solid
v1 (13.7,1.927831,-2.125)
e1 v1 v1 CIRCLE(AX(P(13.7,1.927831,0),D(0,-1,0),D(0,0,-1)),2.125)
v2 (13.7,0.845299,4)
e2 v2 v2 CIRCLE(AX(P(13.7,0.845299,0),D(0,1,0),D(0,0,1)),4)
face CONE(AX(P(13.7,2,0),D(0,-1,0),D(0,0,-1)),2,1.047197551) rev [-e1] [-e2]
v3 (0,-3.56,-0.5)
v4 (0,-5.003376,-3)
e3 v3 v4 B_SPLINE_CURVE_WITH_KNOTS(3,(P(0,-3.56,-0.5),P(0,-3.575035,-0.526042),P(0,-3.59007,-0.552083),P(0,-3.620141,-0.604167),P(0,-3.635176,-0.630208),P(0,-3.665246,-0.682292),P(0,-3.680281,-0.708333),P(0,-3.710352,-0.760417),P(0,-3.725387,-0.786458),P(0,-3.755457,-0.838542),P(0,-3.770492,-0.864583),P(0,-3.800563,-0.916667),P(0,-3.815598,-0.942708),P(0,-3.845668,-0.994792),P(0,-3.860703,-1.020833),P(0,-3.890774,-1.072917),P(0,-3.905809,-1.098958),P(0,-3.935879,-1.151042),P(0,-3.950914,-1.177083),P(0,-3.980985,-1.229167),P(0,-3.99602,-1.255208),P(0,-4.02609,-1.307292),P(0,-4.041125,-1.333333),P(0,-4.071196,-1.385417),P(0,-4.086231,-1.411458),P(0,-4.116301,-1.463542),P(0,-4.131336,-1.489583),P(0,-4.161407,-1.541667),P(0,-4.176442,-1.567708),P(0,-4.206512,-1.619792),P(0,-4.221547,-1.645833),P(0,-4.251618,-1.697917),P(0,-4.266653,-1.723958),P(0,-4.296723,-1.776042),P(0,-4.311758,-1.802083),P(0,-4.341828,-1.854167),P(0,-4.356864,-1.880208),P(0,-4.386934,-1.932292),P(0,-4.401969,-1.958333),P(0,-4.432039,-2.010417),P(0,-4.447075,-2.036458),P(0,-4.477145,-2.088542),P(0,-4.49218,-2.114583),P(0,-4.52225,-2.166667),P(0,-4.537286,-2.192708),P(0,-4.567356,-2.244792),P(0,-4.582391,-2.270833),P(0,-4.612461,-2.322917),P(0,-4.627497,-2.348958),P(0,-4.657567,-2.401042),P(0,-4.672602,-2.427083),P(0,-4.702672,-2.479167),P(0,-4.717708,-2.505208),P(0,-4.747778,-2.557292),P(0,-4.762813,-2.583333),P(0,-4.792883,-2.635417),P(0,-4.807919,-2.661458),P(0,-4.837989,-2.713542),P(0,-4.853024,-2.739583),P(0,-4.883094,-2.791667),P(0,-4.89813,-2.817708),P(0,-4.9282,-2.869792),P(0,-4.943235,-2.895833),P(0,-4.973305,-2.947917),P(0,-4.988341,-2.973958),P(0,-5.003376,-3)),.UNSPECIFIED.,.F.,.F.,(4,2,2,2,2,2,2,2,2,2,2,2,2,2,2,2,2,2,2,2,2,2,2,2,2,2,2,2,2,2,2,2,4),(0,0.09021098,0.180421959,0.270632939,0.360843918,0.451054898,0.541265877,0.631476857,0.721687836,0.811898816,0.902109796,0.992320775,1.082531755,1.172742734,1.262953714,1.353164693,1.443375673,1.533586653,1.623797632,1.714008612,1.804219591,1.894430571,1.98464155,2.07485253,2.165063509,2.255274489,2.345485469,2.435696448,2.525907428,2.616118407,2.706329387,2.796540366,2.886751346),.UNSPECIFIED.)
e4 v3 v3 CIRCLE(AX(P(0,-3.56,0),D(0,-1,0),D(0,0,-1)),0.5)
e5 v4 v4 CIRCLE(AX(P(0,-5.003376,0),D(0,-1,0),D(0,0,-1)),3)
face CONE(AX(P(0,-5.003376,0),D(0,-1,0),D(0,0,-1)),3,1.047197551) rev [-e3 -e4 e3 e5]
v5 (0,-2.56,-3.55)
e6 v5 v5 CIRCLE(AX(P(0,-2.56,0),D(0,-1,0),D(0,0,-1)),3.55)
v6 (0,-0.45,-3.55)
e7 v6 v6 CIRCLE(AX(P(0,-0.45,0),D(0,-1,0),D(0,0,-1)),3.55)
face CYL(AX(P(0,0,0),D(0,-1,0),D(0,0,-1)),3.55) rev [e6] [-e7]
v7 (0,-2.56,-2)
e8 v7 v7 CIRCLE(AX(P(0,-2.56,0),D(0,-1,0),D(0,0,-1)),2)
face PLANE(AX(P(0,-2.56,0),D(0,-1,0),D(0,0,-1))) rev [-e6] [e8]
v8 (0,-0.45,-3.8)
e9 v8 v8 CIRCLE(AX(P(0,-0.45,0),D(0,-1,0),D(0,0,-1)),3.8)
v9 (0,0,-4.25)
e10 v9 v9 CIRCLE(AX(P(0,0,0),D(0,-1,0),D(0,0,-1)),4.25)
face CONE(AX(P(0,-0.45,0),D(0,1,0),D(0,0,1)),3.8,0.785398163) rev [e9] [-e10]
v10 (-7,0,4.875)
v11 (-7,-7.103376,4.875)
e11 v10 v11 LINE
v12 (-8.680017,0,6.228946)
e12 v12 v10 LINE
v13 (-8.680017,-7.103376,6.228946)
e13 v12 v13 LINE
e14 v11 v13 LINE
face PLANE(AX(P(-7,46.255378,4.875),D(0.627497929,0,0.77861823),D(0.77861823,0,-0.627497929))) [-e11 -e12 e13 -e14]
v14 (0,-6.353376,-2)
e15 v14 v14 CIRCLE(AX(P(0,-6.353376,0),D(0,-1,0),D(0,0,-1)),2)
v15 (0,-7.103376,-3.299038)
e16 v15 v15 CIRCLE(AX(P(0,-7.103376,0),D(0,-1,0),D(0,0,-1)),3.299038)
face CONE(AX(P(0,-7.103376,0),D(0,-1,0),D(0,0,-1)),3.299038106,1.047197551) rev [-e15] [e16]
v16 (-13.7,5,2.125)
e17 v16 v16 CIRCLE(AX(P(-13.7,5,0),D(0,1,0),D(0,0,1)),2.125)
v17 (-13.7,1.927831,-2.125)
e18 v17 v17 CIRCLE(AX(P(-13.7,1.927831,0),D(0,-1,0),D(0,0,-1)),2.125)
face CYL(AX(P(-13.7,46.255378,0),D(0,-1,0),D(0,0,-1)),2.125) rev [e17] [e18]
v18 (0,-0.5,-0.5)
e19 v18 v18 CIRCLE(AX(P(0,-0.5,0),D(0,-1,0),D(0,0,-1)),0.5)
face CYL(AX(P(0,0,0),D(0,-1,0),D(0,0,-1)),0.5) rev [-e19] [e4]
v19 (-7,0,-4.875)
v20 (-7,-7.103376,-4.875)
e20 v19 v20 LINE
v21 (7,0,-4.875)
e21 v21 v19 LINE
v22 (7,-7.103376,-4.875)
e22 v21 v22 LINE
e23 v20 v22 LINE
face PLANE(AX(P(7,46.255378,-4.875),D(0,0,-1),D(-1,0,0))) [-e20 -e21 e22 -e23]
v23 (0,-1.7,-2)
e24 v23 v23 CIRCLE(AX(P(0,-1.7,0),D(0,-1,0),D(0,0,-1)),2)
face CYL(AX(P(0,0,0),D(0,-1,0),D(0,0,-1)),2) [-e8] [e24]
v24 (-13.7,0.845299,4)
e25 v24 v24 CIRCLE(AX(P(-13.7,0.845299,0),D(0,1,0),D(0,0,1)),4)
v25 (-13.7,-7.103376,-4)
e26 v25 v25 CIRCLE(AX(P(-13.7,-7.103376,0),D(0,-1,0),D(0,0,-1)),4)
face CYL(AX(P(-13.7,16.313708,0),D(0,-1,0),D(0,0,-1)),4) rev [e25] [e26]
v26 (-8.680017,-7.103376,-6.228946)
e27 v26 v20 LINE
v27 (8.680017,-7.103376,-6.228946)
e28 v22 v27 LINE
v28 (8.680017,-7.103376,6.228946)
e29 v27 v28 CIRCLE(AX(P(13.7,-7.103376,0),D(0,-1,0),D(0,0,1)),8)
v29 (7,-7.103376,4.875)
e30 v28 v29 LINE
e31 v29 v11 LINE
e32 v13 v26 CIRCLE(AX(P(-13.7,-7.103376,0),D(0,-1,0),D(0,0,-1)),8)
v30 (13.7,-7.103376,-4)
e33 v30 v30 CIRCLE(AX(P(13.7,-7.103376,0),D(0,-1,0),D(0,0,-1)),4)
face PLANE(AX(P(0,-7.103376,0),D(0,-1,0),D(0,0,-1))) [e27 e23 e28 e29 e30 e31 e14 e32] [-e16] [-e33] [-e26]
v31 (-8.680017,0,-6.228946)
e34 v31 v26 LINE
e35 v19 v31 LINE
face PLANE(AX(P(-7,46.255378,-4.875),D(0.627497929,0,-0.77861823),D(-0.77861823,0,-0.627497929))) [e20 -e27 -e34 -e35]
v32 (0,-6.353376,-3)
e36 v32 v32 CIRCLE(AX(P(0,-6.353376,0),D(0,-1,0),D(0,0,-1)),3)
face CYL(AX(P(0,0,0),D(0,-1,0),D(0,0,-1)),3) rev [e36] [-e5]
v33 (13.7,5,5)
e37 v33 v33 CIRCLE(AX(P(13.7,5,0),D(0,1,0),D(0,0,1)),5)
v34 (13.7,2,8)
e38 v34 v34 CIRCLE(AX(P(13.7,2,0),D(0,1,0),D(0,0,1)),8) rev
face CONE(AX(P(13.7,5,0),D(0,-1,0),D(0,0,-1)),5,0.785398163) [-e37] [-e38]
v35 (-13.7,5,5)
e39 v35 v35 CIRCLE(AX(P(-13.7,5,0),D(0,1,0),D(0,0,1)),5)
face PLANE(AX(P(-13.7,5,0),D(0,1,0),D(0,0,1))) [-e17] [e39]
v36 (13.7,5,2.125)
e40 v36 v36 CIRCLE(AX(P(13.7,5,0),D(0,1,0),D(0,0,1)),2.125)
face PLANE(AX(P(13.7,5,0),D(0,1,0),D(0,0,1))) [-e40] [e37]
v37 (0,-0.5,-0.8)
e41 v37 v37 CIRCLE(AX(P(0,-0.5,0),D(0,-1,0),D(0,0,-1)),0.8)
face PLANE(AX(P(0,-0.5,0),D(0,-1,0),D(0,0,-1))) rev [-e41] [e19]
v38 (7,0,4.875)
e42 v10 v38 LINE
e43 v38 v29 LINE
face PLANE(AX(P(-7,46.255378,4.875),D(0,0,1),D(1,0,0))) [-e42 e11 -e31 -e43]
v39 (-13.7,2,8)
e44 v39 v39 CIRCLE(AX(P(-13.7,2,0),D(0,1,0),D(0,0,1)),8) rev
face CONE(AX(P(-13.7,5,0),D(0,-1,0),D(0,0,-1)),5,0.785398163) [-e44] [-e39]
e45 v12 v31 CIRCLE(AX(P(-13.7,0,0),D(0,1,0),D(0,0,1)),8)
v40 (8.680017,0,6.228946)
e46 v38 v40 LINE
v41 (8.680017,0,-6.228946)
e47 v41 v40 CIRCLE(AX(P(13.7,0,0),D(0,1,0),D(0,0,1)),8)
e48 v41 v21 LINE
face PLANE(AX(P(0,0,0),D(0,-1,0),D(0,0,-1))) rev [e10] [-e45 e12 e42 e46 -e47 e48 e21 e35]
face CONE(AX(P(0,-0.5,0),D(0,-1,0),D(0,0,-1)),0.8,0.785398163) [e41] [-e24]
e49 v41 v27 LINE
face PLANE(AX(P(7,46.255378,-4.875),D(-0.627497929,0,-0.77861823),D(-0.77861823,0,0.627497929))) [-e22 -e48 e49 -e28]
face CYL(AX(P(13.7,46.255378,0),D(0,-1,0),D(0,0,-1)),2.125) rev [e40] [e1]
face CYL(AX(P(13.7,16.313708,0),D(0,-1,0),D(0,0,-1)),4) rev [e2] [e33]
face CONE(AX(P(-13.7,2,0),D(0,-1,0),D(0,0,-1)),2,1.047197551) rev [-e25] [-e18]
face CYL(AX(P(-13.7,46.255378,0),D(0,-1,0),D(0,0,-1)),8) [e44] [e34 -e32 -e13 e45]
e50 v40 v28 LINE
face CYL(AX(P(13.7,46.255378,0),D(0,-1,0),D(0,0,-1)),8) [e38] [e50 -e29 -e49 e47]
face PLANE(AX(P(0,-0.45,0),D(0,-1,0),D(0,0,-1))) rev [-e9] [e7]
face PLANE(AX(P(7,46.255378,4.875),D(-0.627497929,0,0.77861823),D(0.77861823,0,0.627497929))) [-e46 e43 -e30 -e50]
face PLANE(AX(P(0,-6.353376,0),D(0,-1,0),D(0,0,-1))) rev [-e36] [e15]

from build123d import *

# Parameters (mm, degrees)
BOSS_EXTRUDE3_START = -7.103375673
SKETCH4_R           = 2.125
SKETCH4_R_2         = 4.25
BOSS_EXTRUDE3_DEPTH = 7.103375673
BOSS_EXTRUDE4_START = 5
SKETCH6_R           = 8
SKETCH6_R_2         = 2.125
BOSS_EXTRUDE4_DEPTH = 5
SKETCH5_R           = 4
CUT_EXTRUDE2_DEPTH  = 9.103375673
CHAMFER2_SIZE       = 1.154700538
CHAMFER2_SIZE_2     = 2
CHAMFER3_SIZE       = 3


# Read off the part's stored shape, not the designer's step: Revolve1
with BuildPart() as part:
    # Revolve1 outline → Revolve1 (revolve)
    with BuildSketch(Plane.XY):
        Polygon((4.25, 0), (3.8, -0.45), (3.55, -0.45), (3.55, -2.56), (2, -2.56), (2, -1.7), (0.8, -0.5), (0.5, -0.5), (0.5, -3.56), (3, -5.003375673), (3, -6.353375673), (2, -6.353375673), (3.299038106, -7.103375673), (4.25, -7.103375673), align=None)
    revolve(axis=Axis((0, 0, 0), (0, 1, 0)))

    # Sketch4 → Boss-Extrude3 (add)
    with BuildSketch(Plane.XZ.offset(7.103375673).offset(BOSS_EXTRUDE3_START)):
        with BuildLine():
            Line((-7, 4.875), (7, 4.875))
            Line((7, 4.875), (8.680016564, 6.228945842))
            ThreePointArc((8.680016564, 6.228945842), (21.7, 0), (8.680016564, -6.228945842))
            Line((8.680016564, -6.228945842), (7, -4.875))
            Line((7, -4.875), (-7, -4.875))
            Line((-7, -4.875), (-8.680016564, -6.228945842))
            ThreePointArc((-8.680016564, -6.228945842), (-21.7, 0), (-8.680016564, 6.228945842))
            Line((-8.680016564, 6.228945842), (-7, 4.875))
        make_face()
        with Locations(Location((-13.7, 0, 0), (0, 0, 270))):
            Circle(SKETCH4_R, mode=Mode.SUBTRACT)
        with Locations(Location((13.7, 0, 0), (0, 0, 270))):
            Circle(SKETCH4_R, mode=Mode.SUBTRACT)
        Circle(SKETCH4_R_2, mode=Mode.SUBTRACT)
    extrude(amount=BOSS_EXTRUDE3_DEPTH)

    # Sketch6 → Boss-Extrude4 (add)
    # profile 1 of 2: a face of its own
    with BuildSketch(Plane(origin=(0, 0, 0), x_dir=(1, 0, 0), z_dir=(0, 1, 0)).offset(BOSS_EXTRUDE4_START)):
        with Locations(Location((-13.7, 0, 0), (0, 0, 51.134235394))):
            Circle(SKETCH6_R)
        with Locations(Location((-13.7, 0, 0), (0, 0, 90))):
            Circle(SKETCH6_R_2, mode=Mode.SUBTRACT)
    # profile 2 of 2: a face of its own
    with BuildSketch(Plane(origin=(0, 0, 0), x_dir=(1, 0, 0), z_dir=(0, 1, 0)).offset(BOSS_EXTRUDE4_START)):
        with Locations(Location((13.7, 0, 0), (0, 0, 128.865764606))):
            Circle(SKETCH6_R)
        with Locations(Location((13.7, 0, 0), (0, 0, 90))):
            Circle(SKETCH6_R_2, mode=Mode.SUBTRACT)
    extrude(amount=-BOSS_EXTRUDE4_DEPTH)

    # Sketch5 → Cut-Extrude2 (cut)
    with BuildSketch(Plane.XZ.offset(7.103375673)):
        with Locations(Location((-13.699999648, 0, 0), (0, 0, 270))):
            Circle(SKETCH5_R)
        with Locations(Location((13.7, 0, 0), (0, 0, 270))):
            Circle(SKETCH5_R)
    extrude(amount=-CUT_EXTRUDE2_DEPTH, mode=Mode.SUBTRACT)

    # Chamfer2
    # the kernel refuses this chamfer: 2, 1.154700538 mm, written as the material it adds along each edge
    with BuildSketch(Plane(origin=(-13.699999648, 2, 0), x_dir=(0, 0, -1), z_dir=(-1, 0, 0))) as chamfer2_piece_1_section:
        Polygon((4, CHAMFER2_SIZE), (4 - CHAMFER2_SIZE_2, 0), (4, 0), align=None)
    chamfer2_piece_1 = revolve(axis=Axis((-13.699999648, 2, 0), (0, -1, 0)), mode=Mode.PRIVATE)
    chamfer2_piece_1 = chamfer2_piece_1 - Plane(origin=(-13.7, 1.411589212, 0), x_dir=(0, 0, -1), z_dir=(0, 1, 0)) * Cylinder(2.125, 17, mode=Mode.PRIVATE)
    add(chamfer2_piece_1)
    with BuildSketch(Plane(origin=(13.7, 2, 0), x_dir=(0, 0, -1), z_dir=(-1, 0, 0))) as chamfer2_piece_2_section:
        Polygon((4, CHAMFER2_SIZE), (4 - CHAMFER2_SIZE_2, 0), (4, 0), align=None)
    chamfer2_piece_2 = revolve(axis=Axis((13.7, 2, 0), (0, -1, 0)), mode=Mode.PRIVATE)
    chamfer2_piece_2 = chamfer2_piece_2 - Plane(origin=(13.7, 1.41158911, 0), x_dir=(0, 0, -1), z_dir=(0, 1, 0)) * Cylinder(2.125, 16, mode=Mode.PRIVATE)
    add(chamfer2_piece_2)

    # Chamfer3
    chamfer3_edges = [part.edges().sort_by_distance(p)[0] for p in [
        (-18.719983436, 5, 6.228945842),
        (18.719983436, 5, 6.228945842),
    ]]
    chamfer(chamfer3_edges, length=CHAMFER3_SIZE)


solid = part.part
